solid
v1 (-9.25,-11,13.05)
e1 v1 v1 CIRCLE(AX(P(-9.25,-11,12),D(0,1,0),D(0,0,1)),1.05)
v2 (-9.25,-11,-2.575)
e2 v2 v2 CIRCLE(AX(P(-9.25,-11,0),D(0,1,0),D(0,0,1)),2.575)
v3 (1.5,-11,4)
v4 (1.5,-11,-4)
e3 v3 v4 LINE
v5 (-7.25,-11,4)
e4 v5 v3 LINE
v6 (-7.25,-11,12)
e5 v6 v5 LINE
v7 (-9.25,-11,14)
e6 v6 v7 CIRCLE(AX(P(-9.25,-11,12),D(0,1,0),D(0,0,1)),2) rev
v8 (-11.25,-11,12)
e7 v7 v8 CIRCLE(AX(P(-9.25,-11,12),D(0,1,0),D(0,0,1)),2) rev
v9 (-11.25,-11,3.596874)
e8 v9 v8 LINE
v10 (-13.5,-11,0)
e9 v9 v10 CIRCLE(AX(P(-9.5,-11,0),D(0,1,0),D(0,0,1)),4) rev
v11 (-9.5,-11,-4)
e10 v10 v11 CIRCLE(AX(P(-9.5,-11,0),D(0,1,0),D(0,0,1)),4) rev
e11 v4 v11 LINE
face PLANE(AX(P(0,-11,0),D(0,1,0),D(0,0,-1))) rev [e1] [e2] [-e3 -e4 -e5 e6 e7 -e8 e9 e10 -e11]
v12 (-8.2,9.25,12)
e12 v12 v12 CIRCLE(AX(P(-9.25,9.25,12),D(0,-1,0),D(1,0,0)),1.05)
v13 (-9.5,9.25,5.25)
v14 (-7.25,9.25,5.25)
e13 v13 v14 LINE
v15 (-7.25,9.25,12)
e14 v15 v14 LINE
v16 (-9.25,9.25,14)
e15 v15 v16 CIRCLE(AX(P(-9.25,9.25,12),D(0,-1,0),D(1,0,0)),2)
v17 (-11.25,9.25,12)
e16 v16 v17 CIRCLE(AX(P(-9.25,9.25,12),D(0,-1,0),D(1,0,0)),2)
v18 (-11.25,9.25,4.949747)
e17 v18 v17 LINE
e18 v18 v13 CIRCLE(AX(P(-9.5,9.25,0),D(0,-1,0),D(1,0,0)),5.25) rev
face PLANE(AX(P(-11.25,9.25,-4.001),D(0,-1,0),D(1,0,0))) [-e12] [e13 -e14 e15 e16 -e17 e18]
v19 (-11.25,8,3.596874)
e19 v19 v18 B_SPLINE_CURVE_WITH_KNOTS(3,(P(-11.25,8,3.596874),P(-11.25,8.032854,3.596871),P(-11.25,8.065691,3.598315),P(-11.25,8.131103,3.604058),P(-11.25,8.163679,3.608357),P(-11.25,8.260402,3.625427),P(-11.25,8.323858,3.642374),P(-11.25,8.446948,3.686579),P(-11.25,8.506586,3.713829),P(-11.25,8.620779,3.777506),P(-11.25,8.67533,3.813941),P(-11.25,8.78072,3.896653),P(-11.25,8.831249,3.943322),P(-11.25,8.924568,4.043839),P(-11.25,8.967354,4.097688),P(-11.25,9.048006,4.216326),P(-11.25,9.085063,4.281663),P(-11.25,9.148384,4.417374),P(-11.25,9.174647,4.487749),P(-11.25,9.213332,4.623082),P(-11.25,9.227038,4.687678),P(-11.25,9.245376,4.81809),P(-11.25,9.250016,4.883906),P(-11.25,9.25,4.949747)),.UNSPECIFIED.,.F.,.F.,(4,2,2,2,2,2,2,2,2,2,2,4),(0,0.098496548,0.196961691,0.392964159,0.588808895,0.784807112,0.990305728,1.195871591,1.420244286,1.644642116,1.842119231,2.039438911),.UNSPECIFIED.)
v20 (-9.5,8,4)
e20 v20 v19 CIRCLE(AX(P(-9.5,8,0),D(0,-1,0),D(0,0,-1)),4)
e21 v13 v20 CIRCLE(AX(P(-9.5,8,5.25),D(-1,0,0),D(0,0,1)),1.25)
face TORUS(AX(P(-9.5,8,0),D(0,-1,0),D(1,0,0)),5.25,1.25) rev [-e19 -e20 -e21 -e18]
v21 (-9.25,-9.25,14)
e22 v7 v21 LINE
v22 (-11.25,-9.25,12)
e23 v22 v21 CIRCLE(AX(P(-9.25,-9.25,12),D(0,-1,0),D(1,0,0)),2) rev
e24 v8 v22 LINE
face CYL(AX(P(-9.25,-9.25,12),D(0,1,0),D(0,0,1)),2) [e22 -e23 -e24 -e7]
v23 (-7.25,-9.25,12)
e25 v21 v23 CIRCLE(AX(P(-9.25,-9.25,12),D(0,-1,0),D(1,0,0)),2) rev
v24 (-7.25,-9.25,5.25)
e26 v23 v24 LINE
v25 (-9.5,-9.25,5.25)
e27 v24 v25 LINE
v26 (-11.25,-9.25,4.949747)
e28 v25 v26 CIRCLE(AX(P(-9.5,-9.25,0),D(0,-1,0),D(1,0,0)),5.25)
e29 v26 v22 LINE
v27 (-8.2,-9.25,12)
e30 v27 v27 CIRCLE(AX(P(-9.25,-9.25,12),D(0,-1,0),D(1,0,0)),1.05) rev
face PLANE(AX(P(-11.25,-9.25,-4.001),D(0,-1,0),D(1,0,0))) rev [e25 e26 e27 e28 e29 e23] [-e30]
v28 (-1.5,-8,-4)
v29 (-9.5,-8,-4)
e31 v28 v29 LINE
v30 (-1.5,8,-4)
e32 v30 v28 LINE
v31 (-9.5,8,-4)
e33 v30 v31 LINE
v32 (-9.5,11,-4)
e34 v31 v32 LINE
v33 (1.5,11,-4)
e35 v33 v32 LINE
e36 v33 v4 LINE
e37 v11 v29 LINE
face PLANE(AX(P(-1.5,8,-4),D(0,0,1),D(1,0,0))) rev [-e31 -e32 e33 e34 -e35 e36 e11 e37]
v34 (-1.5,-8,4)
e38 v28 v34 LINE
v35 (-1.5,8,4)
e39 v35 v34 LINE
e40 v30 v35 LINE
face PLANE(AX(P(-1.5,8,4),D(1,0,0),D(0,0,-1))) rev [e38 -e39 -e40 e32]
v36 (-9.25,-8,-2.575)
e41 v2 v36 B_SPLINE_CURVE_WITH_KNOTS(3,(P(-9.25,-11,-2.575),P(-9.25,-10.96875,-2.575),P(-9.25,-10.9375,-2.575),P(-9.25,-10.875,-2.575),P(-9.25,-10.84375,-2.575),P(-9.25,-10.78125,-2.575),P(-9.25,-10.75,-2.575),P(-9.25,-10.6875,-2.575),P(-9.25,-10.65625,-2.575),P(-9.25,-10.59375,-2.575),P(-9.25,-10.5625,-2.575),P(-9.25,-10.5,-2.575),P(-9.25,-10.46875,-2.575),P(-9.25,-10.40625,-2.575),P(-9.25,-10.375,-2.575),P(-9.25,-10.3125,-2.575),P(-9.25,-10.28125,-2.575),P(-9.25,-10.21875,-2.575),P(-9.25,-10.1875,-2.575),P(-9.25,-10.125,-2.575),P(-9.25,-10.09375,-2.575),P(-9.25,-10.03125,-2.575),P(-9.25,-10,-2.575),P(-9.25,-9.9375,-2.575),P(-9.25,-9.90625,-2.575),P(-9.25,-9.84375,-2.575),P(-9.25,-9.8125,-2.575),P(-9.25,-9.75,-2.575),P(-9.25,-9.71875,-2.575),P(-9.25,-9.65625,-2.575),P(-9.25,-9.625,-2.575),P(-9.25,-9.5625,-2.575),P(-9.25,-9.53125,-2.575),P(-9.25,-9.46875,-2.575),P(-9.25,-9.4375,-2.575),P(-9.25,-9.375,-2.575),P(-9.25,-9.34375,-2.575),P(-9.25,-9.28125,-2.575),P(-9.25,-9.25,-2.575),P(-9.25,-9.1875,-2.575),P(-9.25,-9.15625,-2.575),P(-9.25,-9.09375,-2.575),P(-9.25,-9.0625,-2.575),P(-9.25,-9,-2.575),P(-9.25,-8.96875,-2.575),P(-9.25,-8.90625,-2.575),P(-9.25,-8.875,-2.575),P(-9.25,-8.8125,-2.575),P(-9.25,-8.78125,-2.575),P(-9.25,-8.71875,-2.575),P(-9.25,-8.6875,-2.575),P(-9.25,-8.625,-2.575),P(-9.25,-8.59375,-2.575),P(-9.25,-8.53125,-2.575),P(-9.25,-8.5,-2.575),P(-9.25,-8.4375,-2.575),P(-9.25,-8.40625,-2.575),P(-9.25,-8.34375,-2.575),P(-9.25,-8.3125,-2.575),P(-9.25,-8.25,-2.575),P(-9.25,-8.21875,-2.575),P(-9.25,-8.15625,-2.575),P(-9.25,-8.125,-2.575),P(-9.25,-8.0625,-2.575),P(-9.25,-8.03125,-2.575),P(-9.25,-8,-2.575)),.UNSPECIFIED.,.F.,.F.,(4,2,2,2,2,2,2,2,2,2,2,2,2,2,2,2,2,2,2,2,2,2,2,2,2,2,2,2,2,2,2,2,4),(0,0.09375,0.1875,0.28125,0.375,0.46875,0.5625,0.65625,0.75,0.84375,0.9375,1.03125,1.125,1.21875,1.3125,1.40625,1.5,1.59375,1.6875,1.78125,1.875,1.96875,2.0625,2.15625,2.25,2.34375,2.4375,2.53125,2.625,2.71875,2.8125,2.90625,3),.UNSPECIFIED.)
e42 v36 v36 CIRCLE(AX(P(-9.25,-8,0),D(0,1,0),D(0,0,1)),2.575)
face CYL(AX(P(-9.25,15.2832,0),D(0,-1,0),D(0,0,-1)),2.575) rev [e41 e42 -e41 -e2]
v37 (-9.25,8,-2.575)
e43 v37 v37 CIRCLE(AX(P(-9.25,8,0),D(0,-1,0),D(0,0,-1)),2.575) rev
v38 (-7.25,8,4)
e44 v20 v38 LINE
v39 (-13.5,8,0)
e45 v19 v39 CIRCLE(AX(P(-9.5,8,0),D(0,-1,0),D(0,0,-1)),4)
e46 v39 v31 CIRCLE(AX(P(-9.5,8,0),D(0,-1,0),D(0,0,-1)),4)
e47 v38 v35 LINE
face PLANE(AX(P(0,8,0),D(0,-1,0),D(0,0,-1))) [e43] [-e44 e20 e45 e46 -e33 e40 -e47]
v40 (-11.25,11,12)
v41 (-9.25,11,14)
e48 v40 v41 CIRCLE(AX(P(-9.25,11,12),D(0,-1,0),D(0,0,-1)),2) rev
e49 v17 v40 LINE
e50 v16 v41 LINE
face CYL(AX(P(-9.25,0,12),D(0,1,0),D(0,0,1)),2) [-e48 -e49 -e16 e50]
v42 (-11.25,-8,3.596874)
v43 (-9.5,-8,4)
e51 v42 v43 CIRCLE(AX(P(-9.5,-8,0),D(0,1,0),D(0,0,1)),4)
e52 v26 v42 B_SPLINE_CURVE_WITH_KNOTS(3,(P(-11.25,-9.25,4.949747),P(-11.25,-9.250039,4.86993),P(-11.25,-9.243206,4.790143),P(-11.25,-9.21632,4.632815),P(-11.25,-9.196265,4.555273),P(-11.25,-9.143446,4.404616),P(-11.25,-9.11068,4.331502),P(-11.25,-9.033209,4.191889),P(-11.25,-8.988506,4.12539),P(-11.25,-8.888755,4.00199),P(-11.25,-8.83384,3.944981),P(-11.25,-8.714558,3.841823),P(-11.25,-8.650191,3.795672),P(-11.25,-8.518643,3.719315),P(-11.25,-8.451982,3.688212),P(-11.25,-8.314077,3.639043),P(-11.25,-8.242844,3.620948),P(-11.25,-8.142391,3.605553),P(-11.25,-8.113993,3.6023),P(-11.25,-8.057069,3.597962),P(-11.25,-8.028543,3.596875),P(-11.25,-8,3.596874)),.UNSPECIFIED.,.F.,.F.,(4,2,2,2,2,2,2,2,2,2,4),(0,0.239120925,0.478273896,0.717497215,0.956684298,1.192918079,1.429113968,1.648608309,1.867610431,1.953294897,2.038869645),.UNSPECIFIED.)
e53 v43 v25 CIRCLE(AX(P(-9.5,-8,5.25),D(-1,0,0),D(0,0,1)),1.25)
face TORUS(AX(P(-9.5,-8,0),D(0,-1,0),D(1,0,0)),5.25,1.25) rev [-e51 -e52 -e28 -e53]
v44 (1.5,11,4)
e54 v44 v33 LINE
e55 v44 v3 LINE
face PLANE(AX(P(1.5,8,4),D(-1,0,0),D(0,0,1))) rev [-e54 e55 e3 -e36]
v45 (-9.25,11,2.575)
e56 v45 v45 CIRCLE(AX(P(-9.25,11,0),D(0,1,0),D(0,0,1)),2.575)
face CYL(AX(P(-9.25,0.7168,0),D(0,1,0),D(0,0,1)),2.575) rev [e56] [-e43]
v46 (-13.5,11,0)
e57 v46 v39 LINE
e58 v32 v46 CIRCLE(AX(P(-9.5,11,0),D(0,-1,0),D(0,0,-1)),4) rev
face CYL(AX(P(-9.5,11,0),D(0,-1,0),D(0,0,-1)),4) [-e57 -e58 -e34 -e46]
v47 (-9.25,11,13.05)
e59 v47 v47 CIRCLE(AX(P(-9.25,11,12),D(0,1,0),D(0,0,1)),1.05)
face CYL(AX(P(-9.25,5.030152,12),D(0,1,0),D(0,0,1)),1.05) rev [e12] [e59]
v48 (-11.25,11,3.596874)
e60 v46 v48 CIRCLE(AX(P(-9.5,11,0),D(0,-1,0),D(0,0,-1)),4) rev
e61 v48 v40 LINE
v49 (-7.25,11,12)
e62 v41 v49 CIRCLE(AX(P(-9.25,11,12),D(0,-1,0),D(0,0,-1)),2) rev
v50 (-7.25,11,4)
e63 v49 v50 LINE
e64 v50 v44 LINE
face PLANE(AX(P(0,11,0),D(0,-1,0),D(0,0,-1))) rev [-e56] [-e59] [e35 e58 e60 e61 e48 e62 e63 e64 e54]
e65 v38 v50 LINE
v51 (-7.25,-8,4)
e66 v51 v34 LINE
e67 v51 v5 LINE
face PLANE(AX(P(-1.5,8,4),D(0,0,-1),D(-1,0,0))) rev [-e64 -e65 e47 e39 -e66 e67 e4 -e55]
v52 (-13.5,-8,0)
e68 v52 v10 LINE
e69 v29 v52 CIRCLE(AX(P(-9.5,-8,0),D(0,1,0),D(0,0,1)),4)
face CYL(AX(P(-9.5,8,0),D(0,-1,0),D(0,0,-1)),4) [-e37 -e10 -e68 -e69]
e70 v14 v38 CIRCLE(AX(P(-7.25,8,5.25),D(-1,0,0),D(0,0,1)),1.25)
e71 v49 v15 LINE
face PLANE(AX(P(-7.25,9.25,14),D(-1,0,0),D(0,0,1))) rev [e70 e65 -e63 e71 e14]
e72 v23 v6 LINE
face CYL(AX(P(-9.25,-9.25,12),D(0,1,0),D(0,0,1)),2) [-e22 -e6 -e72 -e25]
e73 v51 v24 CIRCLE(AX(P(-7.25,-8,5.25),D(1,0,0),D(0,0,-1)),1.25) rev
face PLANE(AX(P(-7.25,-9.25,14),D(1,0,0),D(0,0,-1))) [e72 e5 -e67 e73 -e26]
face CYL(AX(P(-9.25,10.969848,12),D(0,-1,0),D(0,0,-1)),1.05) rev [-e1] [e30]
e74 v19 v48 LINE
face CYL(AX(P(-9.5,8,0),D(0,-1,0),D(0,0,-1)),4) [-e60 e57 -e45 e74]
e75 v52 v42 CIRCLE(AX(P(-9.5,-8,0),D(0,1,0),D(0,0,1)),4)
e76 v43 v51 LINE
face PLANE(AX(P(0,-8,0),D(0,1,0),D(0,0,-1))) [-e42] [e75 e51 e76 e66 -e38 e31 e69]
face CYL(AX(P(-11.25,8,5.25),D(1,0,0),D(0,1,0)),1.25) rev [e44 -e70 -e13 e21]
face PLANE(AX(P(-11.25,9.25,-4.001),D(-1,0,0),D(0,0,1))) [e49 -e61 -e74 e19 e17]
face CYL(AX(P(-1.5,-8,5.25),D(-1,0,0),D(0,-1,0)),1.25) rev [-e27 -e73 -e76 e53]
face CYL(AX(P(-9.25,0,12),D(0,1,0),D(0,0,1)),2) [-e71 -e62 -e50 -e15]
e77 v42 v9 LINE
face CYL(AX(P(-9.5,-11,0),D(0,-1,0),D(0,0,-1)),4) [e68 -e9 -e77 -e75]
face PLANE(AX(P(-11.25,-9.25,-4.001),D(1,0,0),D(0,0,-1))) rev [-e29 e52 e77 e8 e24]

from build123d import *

# Parameters (mm, degrees)
SKETCH1_W                       = 3
SKETCH1_H                       = 8
BOSS_EXTRUDE1_DEPTH             = 8
SKETCH2_W                       = 15
SKETCH2_H                       = 8
BOSS_EXTRUDE2_DEPTH             = 3
SKETCH3_R                       = 2.575
CUT_EXTRUDE1_DEPTH              = 3
FILLET1_R                       = 4
SKETCH4_W                       = 4
SKETCH4_H                       = 1.75
BOSS_EXTRUDE3_DEPTH             = 10
BOSS_EXTRUDE3_DIRECTION_2_REACH = 21.164
SKETCH5_R                       = 1.05
CUT_EXTRUDE2_DEPTH              = 3
FILLET2_R                       = 2
FILLET3_R                       = 1.25
FILLET1_OF_MIRROR1_R            = 4
FILLET2_OF_MIRROR1_R            = 2
FILLET3_OF_MIRROR1_R            = 1.25


with BuildPart() as part:
    # Sketch1 → Boss-Extrude1 (new body)
    with BuildSketch(Plane(origin=(0, 0, 0), x_dir=(1, 0, 0), z_dir=(0, 1, 0))):
        Rectangle(SKETCH1_W, SKETCH1_H)
    boss_extrude1 = extrude(amount=BOSS_EXTRUDE1_DEPTH)

    # Sketch2 → Boss-Extrude2 (add)
    with BuildSketch(Plane(origin=(0, 8, 0), x_dir=(1, 0, 0), z_dir=(0, 1, 0))):
        with Locations((-6, 0)):
            Rectangle(SKETCH2_W, SKETCH2_H)
    boss_extrude2 = extrude(amount=BOSS_EXTRUDE2_DEPTH)

    # Sketch3 → Cut-Extrude1 (cut)
    with BuildSketch(Plane(origin=(0, 11, 0), x_dir=(1, 0, 0), z_dir=(0, 1, 0))):
        with Locations(Location((-9.25, 0, 0), (0, 0, 270))):
            Circle(SKETCH3_R)
    cut_extrude1 = extrude(amount=-CUT_EXTRUDE1_DEPTH, mode=Mode.SUBTRACT)

    # Fillet1
    fillet1_edges = [part.edges().sort_by_distance(p)[0] for p in [
        (-13.5, 9.5, 4),
        (-13.5, 9.5, -4),
    ]]
    fillet(fillet1_edges, radius=FILLET1_R - 0.0001)  # a hair under: the kernel refuses the full size

    # Sketch4 → Boss-Extrude3 (add)
    with BuildSketch(Plane.XY.offset(4)):
        with Locations((-9.25, 10.125)):
            Rectangle(SKETCH4_W, SKETCH4_H)
    boss_extrude3 = extrude(amount=BOSS_EXTRUDE3_DEPTH)

    # Sketch4 → Boss-Extrude3 direction 2 (add, up to next)
    with BuildSketch(Plane.XY.offset(4), mode=Mode.PRIVATE) as boss_extrude3_direction_2_sk1:
        with Locations((-9.25, 10.125)):
            Rectangle(SKETCH4_W, SKETCH4_H)
    boss_extrude3_direction_2_tool1 = extrude(boss_extrude3_direction_2_sk1.sketch, amount=-BOSS_EXTRUDE3_DIRECTION_2_REACH, mode=Mode.PRIVATE) - part.part
    boss_extrude3_direction_2 = boss_extrude3_direction_2_tool1.solids().sort_by_distance((-9.25, 10.125, 4))[0]
    add(boss_extrude3_direction_2)

    # Sketch5 → Cut-Extrude2 (cut)
    with BuildSketch(Plane(origin=(0, 11, 0), x_dir=(1, 0, 0), z_dir=(0, 1, 0))):
        with Locations(Location((-9.25, -12, 0), (0, 0, 270))):
            Circle(SKETCH5_R)
    cut_extrude2 = extrude(amount=-CUT_EXTRUDE2_DEPTH, mode=Mode.SUBTRACT)

    # Fillet2
    fillet2_edges = [part.edges().sort_by_distance(p)[0] for p in [
        (-11.25, 10.125, 14),
        (-7.25, 10.125, 14),
    ]]
    fillet(fillet2_edges, radius=FILLET2_R - 0.0001)  # a hair under: the kernel refuses the full size

    # Fillet3
    fillet3_edges = [part.edges().sort_by_distance(p)[0] for p in [
        (-8.37505, 9.25, 4),
        (-10.397962835, 9.25, 3.897925335),
    ]]
    fillet(fillet3_edges, radius=FILLET3_R - 0.0001)  # a hair under: the kernel refuses the full size

    # Mirror1: Boss-Extrude1, Boss-Extrude2, Cut-Extrude1, Boss-Extrude3, Boss-Extrude3 direction 2, Cut-Extrude2 across plane
    add(boss_extrude1.mirror(Plane.ZX))
    add(boss_extrude2.mirror(Plane.ZX))
    add(cut_extrude1.mirror(Plane.ZX), mode=Mode.SUBTRACT)
    add(boss_extrude3.mirror(Plane.ZX))
    add(boss_extrude3_direction_2.mirror(Plane.ZX))
    add(cut_extrude2.mirror(Plane.ZX), mode=Mode.SUBTRACT)

    # Fillet1 of Mirror1
    fillet1_of_mirror1_edges = [part.edges().sort_by_distance(p)[0] for p in [
        (-13.5, -9.5, 4),
        (-13.5, -9.5, -4),
    ]]
    fillet(fillet1_of_mirror1_edges, radius=FILLET1_OF_MIRROR1_R - 0.0001)  # a hair under: the kernel refuses the full size

    # Fillet2 of Mirror1
    fillet2_of_mirror1_edges = [part.edges().sort_by_distance(p)[0] for p in [
        (-11.25, -10.125, 14),
        (-7.25, -10.125, 14),
    ]]
    fillet(fillet2_of_mirror1_edges, radius=FILLET2_OF_MIRROR1_R - 0.0001)  # a hair under: the kernel refuses the full size

    # Fillet3 of Mirror1
    fillet3_of_mirror1_edges = [part.edges().sort_by_distance(p)[0] for p in [
        (-8.37505, -9.25, 4),
        (-10.397962835, -9.25, 3.897925335),
    ]]
    fillet(fillet3_of_mirror1_edges, radius=FILLET3_OF_MIRROR1_R - 0.0001)  # a hair under: the kernel refuses the full size


solid = part.part
